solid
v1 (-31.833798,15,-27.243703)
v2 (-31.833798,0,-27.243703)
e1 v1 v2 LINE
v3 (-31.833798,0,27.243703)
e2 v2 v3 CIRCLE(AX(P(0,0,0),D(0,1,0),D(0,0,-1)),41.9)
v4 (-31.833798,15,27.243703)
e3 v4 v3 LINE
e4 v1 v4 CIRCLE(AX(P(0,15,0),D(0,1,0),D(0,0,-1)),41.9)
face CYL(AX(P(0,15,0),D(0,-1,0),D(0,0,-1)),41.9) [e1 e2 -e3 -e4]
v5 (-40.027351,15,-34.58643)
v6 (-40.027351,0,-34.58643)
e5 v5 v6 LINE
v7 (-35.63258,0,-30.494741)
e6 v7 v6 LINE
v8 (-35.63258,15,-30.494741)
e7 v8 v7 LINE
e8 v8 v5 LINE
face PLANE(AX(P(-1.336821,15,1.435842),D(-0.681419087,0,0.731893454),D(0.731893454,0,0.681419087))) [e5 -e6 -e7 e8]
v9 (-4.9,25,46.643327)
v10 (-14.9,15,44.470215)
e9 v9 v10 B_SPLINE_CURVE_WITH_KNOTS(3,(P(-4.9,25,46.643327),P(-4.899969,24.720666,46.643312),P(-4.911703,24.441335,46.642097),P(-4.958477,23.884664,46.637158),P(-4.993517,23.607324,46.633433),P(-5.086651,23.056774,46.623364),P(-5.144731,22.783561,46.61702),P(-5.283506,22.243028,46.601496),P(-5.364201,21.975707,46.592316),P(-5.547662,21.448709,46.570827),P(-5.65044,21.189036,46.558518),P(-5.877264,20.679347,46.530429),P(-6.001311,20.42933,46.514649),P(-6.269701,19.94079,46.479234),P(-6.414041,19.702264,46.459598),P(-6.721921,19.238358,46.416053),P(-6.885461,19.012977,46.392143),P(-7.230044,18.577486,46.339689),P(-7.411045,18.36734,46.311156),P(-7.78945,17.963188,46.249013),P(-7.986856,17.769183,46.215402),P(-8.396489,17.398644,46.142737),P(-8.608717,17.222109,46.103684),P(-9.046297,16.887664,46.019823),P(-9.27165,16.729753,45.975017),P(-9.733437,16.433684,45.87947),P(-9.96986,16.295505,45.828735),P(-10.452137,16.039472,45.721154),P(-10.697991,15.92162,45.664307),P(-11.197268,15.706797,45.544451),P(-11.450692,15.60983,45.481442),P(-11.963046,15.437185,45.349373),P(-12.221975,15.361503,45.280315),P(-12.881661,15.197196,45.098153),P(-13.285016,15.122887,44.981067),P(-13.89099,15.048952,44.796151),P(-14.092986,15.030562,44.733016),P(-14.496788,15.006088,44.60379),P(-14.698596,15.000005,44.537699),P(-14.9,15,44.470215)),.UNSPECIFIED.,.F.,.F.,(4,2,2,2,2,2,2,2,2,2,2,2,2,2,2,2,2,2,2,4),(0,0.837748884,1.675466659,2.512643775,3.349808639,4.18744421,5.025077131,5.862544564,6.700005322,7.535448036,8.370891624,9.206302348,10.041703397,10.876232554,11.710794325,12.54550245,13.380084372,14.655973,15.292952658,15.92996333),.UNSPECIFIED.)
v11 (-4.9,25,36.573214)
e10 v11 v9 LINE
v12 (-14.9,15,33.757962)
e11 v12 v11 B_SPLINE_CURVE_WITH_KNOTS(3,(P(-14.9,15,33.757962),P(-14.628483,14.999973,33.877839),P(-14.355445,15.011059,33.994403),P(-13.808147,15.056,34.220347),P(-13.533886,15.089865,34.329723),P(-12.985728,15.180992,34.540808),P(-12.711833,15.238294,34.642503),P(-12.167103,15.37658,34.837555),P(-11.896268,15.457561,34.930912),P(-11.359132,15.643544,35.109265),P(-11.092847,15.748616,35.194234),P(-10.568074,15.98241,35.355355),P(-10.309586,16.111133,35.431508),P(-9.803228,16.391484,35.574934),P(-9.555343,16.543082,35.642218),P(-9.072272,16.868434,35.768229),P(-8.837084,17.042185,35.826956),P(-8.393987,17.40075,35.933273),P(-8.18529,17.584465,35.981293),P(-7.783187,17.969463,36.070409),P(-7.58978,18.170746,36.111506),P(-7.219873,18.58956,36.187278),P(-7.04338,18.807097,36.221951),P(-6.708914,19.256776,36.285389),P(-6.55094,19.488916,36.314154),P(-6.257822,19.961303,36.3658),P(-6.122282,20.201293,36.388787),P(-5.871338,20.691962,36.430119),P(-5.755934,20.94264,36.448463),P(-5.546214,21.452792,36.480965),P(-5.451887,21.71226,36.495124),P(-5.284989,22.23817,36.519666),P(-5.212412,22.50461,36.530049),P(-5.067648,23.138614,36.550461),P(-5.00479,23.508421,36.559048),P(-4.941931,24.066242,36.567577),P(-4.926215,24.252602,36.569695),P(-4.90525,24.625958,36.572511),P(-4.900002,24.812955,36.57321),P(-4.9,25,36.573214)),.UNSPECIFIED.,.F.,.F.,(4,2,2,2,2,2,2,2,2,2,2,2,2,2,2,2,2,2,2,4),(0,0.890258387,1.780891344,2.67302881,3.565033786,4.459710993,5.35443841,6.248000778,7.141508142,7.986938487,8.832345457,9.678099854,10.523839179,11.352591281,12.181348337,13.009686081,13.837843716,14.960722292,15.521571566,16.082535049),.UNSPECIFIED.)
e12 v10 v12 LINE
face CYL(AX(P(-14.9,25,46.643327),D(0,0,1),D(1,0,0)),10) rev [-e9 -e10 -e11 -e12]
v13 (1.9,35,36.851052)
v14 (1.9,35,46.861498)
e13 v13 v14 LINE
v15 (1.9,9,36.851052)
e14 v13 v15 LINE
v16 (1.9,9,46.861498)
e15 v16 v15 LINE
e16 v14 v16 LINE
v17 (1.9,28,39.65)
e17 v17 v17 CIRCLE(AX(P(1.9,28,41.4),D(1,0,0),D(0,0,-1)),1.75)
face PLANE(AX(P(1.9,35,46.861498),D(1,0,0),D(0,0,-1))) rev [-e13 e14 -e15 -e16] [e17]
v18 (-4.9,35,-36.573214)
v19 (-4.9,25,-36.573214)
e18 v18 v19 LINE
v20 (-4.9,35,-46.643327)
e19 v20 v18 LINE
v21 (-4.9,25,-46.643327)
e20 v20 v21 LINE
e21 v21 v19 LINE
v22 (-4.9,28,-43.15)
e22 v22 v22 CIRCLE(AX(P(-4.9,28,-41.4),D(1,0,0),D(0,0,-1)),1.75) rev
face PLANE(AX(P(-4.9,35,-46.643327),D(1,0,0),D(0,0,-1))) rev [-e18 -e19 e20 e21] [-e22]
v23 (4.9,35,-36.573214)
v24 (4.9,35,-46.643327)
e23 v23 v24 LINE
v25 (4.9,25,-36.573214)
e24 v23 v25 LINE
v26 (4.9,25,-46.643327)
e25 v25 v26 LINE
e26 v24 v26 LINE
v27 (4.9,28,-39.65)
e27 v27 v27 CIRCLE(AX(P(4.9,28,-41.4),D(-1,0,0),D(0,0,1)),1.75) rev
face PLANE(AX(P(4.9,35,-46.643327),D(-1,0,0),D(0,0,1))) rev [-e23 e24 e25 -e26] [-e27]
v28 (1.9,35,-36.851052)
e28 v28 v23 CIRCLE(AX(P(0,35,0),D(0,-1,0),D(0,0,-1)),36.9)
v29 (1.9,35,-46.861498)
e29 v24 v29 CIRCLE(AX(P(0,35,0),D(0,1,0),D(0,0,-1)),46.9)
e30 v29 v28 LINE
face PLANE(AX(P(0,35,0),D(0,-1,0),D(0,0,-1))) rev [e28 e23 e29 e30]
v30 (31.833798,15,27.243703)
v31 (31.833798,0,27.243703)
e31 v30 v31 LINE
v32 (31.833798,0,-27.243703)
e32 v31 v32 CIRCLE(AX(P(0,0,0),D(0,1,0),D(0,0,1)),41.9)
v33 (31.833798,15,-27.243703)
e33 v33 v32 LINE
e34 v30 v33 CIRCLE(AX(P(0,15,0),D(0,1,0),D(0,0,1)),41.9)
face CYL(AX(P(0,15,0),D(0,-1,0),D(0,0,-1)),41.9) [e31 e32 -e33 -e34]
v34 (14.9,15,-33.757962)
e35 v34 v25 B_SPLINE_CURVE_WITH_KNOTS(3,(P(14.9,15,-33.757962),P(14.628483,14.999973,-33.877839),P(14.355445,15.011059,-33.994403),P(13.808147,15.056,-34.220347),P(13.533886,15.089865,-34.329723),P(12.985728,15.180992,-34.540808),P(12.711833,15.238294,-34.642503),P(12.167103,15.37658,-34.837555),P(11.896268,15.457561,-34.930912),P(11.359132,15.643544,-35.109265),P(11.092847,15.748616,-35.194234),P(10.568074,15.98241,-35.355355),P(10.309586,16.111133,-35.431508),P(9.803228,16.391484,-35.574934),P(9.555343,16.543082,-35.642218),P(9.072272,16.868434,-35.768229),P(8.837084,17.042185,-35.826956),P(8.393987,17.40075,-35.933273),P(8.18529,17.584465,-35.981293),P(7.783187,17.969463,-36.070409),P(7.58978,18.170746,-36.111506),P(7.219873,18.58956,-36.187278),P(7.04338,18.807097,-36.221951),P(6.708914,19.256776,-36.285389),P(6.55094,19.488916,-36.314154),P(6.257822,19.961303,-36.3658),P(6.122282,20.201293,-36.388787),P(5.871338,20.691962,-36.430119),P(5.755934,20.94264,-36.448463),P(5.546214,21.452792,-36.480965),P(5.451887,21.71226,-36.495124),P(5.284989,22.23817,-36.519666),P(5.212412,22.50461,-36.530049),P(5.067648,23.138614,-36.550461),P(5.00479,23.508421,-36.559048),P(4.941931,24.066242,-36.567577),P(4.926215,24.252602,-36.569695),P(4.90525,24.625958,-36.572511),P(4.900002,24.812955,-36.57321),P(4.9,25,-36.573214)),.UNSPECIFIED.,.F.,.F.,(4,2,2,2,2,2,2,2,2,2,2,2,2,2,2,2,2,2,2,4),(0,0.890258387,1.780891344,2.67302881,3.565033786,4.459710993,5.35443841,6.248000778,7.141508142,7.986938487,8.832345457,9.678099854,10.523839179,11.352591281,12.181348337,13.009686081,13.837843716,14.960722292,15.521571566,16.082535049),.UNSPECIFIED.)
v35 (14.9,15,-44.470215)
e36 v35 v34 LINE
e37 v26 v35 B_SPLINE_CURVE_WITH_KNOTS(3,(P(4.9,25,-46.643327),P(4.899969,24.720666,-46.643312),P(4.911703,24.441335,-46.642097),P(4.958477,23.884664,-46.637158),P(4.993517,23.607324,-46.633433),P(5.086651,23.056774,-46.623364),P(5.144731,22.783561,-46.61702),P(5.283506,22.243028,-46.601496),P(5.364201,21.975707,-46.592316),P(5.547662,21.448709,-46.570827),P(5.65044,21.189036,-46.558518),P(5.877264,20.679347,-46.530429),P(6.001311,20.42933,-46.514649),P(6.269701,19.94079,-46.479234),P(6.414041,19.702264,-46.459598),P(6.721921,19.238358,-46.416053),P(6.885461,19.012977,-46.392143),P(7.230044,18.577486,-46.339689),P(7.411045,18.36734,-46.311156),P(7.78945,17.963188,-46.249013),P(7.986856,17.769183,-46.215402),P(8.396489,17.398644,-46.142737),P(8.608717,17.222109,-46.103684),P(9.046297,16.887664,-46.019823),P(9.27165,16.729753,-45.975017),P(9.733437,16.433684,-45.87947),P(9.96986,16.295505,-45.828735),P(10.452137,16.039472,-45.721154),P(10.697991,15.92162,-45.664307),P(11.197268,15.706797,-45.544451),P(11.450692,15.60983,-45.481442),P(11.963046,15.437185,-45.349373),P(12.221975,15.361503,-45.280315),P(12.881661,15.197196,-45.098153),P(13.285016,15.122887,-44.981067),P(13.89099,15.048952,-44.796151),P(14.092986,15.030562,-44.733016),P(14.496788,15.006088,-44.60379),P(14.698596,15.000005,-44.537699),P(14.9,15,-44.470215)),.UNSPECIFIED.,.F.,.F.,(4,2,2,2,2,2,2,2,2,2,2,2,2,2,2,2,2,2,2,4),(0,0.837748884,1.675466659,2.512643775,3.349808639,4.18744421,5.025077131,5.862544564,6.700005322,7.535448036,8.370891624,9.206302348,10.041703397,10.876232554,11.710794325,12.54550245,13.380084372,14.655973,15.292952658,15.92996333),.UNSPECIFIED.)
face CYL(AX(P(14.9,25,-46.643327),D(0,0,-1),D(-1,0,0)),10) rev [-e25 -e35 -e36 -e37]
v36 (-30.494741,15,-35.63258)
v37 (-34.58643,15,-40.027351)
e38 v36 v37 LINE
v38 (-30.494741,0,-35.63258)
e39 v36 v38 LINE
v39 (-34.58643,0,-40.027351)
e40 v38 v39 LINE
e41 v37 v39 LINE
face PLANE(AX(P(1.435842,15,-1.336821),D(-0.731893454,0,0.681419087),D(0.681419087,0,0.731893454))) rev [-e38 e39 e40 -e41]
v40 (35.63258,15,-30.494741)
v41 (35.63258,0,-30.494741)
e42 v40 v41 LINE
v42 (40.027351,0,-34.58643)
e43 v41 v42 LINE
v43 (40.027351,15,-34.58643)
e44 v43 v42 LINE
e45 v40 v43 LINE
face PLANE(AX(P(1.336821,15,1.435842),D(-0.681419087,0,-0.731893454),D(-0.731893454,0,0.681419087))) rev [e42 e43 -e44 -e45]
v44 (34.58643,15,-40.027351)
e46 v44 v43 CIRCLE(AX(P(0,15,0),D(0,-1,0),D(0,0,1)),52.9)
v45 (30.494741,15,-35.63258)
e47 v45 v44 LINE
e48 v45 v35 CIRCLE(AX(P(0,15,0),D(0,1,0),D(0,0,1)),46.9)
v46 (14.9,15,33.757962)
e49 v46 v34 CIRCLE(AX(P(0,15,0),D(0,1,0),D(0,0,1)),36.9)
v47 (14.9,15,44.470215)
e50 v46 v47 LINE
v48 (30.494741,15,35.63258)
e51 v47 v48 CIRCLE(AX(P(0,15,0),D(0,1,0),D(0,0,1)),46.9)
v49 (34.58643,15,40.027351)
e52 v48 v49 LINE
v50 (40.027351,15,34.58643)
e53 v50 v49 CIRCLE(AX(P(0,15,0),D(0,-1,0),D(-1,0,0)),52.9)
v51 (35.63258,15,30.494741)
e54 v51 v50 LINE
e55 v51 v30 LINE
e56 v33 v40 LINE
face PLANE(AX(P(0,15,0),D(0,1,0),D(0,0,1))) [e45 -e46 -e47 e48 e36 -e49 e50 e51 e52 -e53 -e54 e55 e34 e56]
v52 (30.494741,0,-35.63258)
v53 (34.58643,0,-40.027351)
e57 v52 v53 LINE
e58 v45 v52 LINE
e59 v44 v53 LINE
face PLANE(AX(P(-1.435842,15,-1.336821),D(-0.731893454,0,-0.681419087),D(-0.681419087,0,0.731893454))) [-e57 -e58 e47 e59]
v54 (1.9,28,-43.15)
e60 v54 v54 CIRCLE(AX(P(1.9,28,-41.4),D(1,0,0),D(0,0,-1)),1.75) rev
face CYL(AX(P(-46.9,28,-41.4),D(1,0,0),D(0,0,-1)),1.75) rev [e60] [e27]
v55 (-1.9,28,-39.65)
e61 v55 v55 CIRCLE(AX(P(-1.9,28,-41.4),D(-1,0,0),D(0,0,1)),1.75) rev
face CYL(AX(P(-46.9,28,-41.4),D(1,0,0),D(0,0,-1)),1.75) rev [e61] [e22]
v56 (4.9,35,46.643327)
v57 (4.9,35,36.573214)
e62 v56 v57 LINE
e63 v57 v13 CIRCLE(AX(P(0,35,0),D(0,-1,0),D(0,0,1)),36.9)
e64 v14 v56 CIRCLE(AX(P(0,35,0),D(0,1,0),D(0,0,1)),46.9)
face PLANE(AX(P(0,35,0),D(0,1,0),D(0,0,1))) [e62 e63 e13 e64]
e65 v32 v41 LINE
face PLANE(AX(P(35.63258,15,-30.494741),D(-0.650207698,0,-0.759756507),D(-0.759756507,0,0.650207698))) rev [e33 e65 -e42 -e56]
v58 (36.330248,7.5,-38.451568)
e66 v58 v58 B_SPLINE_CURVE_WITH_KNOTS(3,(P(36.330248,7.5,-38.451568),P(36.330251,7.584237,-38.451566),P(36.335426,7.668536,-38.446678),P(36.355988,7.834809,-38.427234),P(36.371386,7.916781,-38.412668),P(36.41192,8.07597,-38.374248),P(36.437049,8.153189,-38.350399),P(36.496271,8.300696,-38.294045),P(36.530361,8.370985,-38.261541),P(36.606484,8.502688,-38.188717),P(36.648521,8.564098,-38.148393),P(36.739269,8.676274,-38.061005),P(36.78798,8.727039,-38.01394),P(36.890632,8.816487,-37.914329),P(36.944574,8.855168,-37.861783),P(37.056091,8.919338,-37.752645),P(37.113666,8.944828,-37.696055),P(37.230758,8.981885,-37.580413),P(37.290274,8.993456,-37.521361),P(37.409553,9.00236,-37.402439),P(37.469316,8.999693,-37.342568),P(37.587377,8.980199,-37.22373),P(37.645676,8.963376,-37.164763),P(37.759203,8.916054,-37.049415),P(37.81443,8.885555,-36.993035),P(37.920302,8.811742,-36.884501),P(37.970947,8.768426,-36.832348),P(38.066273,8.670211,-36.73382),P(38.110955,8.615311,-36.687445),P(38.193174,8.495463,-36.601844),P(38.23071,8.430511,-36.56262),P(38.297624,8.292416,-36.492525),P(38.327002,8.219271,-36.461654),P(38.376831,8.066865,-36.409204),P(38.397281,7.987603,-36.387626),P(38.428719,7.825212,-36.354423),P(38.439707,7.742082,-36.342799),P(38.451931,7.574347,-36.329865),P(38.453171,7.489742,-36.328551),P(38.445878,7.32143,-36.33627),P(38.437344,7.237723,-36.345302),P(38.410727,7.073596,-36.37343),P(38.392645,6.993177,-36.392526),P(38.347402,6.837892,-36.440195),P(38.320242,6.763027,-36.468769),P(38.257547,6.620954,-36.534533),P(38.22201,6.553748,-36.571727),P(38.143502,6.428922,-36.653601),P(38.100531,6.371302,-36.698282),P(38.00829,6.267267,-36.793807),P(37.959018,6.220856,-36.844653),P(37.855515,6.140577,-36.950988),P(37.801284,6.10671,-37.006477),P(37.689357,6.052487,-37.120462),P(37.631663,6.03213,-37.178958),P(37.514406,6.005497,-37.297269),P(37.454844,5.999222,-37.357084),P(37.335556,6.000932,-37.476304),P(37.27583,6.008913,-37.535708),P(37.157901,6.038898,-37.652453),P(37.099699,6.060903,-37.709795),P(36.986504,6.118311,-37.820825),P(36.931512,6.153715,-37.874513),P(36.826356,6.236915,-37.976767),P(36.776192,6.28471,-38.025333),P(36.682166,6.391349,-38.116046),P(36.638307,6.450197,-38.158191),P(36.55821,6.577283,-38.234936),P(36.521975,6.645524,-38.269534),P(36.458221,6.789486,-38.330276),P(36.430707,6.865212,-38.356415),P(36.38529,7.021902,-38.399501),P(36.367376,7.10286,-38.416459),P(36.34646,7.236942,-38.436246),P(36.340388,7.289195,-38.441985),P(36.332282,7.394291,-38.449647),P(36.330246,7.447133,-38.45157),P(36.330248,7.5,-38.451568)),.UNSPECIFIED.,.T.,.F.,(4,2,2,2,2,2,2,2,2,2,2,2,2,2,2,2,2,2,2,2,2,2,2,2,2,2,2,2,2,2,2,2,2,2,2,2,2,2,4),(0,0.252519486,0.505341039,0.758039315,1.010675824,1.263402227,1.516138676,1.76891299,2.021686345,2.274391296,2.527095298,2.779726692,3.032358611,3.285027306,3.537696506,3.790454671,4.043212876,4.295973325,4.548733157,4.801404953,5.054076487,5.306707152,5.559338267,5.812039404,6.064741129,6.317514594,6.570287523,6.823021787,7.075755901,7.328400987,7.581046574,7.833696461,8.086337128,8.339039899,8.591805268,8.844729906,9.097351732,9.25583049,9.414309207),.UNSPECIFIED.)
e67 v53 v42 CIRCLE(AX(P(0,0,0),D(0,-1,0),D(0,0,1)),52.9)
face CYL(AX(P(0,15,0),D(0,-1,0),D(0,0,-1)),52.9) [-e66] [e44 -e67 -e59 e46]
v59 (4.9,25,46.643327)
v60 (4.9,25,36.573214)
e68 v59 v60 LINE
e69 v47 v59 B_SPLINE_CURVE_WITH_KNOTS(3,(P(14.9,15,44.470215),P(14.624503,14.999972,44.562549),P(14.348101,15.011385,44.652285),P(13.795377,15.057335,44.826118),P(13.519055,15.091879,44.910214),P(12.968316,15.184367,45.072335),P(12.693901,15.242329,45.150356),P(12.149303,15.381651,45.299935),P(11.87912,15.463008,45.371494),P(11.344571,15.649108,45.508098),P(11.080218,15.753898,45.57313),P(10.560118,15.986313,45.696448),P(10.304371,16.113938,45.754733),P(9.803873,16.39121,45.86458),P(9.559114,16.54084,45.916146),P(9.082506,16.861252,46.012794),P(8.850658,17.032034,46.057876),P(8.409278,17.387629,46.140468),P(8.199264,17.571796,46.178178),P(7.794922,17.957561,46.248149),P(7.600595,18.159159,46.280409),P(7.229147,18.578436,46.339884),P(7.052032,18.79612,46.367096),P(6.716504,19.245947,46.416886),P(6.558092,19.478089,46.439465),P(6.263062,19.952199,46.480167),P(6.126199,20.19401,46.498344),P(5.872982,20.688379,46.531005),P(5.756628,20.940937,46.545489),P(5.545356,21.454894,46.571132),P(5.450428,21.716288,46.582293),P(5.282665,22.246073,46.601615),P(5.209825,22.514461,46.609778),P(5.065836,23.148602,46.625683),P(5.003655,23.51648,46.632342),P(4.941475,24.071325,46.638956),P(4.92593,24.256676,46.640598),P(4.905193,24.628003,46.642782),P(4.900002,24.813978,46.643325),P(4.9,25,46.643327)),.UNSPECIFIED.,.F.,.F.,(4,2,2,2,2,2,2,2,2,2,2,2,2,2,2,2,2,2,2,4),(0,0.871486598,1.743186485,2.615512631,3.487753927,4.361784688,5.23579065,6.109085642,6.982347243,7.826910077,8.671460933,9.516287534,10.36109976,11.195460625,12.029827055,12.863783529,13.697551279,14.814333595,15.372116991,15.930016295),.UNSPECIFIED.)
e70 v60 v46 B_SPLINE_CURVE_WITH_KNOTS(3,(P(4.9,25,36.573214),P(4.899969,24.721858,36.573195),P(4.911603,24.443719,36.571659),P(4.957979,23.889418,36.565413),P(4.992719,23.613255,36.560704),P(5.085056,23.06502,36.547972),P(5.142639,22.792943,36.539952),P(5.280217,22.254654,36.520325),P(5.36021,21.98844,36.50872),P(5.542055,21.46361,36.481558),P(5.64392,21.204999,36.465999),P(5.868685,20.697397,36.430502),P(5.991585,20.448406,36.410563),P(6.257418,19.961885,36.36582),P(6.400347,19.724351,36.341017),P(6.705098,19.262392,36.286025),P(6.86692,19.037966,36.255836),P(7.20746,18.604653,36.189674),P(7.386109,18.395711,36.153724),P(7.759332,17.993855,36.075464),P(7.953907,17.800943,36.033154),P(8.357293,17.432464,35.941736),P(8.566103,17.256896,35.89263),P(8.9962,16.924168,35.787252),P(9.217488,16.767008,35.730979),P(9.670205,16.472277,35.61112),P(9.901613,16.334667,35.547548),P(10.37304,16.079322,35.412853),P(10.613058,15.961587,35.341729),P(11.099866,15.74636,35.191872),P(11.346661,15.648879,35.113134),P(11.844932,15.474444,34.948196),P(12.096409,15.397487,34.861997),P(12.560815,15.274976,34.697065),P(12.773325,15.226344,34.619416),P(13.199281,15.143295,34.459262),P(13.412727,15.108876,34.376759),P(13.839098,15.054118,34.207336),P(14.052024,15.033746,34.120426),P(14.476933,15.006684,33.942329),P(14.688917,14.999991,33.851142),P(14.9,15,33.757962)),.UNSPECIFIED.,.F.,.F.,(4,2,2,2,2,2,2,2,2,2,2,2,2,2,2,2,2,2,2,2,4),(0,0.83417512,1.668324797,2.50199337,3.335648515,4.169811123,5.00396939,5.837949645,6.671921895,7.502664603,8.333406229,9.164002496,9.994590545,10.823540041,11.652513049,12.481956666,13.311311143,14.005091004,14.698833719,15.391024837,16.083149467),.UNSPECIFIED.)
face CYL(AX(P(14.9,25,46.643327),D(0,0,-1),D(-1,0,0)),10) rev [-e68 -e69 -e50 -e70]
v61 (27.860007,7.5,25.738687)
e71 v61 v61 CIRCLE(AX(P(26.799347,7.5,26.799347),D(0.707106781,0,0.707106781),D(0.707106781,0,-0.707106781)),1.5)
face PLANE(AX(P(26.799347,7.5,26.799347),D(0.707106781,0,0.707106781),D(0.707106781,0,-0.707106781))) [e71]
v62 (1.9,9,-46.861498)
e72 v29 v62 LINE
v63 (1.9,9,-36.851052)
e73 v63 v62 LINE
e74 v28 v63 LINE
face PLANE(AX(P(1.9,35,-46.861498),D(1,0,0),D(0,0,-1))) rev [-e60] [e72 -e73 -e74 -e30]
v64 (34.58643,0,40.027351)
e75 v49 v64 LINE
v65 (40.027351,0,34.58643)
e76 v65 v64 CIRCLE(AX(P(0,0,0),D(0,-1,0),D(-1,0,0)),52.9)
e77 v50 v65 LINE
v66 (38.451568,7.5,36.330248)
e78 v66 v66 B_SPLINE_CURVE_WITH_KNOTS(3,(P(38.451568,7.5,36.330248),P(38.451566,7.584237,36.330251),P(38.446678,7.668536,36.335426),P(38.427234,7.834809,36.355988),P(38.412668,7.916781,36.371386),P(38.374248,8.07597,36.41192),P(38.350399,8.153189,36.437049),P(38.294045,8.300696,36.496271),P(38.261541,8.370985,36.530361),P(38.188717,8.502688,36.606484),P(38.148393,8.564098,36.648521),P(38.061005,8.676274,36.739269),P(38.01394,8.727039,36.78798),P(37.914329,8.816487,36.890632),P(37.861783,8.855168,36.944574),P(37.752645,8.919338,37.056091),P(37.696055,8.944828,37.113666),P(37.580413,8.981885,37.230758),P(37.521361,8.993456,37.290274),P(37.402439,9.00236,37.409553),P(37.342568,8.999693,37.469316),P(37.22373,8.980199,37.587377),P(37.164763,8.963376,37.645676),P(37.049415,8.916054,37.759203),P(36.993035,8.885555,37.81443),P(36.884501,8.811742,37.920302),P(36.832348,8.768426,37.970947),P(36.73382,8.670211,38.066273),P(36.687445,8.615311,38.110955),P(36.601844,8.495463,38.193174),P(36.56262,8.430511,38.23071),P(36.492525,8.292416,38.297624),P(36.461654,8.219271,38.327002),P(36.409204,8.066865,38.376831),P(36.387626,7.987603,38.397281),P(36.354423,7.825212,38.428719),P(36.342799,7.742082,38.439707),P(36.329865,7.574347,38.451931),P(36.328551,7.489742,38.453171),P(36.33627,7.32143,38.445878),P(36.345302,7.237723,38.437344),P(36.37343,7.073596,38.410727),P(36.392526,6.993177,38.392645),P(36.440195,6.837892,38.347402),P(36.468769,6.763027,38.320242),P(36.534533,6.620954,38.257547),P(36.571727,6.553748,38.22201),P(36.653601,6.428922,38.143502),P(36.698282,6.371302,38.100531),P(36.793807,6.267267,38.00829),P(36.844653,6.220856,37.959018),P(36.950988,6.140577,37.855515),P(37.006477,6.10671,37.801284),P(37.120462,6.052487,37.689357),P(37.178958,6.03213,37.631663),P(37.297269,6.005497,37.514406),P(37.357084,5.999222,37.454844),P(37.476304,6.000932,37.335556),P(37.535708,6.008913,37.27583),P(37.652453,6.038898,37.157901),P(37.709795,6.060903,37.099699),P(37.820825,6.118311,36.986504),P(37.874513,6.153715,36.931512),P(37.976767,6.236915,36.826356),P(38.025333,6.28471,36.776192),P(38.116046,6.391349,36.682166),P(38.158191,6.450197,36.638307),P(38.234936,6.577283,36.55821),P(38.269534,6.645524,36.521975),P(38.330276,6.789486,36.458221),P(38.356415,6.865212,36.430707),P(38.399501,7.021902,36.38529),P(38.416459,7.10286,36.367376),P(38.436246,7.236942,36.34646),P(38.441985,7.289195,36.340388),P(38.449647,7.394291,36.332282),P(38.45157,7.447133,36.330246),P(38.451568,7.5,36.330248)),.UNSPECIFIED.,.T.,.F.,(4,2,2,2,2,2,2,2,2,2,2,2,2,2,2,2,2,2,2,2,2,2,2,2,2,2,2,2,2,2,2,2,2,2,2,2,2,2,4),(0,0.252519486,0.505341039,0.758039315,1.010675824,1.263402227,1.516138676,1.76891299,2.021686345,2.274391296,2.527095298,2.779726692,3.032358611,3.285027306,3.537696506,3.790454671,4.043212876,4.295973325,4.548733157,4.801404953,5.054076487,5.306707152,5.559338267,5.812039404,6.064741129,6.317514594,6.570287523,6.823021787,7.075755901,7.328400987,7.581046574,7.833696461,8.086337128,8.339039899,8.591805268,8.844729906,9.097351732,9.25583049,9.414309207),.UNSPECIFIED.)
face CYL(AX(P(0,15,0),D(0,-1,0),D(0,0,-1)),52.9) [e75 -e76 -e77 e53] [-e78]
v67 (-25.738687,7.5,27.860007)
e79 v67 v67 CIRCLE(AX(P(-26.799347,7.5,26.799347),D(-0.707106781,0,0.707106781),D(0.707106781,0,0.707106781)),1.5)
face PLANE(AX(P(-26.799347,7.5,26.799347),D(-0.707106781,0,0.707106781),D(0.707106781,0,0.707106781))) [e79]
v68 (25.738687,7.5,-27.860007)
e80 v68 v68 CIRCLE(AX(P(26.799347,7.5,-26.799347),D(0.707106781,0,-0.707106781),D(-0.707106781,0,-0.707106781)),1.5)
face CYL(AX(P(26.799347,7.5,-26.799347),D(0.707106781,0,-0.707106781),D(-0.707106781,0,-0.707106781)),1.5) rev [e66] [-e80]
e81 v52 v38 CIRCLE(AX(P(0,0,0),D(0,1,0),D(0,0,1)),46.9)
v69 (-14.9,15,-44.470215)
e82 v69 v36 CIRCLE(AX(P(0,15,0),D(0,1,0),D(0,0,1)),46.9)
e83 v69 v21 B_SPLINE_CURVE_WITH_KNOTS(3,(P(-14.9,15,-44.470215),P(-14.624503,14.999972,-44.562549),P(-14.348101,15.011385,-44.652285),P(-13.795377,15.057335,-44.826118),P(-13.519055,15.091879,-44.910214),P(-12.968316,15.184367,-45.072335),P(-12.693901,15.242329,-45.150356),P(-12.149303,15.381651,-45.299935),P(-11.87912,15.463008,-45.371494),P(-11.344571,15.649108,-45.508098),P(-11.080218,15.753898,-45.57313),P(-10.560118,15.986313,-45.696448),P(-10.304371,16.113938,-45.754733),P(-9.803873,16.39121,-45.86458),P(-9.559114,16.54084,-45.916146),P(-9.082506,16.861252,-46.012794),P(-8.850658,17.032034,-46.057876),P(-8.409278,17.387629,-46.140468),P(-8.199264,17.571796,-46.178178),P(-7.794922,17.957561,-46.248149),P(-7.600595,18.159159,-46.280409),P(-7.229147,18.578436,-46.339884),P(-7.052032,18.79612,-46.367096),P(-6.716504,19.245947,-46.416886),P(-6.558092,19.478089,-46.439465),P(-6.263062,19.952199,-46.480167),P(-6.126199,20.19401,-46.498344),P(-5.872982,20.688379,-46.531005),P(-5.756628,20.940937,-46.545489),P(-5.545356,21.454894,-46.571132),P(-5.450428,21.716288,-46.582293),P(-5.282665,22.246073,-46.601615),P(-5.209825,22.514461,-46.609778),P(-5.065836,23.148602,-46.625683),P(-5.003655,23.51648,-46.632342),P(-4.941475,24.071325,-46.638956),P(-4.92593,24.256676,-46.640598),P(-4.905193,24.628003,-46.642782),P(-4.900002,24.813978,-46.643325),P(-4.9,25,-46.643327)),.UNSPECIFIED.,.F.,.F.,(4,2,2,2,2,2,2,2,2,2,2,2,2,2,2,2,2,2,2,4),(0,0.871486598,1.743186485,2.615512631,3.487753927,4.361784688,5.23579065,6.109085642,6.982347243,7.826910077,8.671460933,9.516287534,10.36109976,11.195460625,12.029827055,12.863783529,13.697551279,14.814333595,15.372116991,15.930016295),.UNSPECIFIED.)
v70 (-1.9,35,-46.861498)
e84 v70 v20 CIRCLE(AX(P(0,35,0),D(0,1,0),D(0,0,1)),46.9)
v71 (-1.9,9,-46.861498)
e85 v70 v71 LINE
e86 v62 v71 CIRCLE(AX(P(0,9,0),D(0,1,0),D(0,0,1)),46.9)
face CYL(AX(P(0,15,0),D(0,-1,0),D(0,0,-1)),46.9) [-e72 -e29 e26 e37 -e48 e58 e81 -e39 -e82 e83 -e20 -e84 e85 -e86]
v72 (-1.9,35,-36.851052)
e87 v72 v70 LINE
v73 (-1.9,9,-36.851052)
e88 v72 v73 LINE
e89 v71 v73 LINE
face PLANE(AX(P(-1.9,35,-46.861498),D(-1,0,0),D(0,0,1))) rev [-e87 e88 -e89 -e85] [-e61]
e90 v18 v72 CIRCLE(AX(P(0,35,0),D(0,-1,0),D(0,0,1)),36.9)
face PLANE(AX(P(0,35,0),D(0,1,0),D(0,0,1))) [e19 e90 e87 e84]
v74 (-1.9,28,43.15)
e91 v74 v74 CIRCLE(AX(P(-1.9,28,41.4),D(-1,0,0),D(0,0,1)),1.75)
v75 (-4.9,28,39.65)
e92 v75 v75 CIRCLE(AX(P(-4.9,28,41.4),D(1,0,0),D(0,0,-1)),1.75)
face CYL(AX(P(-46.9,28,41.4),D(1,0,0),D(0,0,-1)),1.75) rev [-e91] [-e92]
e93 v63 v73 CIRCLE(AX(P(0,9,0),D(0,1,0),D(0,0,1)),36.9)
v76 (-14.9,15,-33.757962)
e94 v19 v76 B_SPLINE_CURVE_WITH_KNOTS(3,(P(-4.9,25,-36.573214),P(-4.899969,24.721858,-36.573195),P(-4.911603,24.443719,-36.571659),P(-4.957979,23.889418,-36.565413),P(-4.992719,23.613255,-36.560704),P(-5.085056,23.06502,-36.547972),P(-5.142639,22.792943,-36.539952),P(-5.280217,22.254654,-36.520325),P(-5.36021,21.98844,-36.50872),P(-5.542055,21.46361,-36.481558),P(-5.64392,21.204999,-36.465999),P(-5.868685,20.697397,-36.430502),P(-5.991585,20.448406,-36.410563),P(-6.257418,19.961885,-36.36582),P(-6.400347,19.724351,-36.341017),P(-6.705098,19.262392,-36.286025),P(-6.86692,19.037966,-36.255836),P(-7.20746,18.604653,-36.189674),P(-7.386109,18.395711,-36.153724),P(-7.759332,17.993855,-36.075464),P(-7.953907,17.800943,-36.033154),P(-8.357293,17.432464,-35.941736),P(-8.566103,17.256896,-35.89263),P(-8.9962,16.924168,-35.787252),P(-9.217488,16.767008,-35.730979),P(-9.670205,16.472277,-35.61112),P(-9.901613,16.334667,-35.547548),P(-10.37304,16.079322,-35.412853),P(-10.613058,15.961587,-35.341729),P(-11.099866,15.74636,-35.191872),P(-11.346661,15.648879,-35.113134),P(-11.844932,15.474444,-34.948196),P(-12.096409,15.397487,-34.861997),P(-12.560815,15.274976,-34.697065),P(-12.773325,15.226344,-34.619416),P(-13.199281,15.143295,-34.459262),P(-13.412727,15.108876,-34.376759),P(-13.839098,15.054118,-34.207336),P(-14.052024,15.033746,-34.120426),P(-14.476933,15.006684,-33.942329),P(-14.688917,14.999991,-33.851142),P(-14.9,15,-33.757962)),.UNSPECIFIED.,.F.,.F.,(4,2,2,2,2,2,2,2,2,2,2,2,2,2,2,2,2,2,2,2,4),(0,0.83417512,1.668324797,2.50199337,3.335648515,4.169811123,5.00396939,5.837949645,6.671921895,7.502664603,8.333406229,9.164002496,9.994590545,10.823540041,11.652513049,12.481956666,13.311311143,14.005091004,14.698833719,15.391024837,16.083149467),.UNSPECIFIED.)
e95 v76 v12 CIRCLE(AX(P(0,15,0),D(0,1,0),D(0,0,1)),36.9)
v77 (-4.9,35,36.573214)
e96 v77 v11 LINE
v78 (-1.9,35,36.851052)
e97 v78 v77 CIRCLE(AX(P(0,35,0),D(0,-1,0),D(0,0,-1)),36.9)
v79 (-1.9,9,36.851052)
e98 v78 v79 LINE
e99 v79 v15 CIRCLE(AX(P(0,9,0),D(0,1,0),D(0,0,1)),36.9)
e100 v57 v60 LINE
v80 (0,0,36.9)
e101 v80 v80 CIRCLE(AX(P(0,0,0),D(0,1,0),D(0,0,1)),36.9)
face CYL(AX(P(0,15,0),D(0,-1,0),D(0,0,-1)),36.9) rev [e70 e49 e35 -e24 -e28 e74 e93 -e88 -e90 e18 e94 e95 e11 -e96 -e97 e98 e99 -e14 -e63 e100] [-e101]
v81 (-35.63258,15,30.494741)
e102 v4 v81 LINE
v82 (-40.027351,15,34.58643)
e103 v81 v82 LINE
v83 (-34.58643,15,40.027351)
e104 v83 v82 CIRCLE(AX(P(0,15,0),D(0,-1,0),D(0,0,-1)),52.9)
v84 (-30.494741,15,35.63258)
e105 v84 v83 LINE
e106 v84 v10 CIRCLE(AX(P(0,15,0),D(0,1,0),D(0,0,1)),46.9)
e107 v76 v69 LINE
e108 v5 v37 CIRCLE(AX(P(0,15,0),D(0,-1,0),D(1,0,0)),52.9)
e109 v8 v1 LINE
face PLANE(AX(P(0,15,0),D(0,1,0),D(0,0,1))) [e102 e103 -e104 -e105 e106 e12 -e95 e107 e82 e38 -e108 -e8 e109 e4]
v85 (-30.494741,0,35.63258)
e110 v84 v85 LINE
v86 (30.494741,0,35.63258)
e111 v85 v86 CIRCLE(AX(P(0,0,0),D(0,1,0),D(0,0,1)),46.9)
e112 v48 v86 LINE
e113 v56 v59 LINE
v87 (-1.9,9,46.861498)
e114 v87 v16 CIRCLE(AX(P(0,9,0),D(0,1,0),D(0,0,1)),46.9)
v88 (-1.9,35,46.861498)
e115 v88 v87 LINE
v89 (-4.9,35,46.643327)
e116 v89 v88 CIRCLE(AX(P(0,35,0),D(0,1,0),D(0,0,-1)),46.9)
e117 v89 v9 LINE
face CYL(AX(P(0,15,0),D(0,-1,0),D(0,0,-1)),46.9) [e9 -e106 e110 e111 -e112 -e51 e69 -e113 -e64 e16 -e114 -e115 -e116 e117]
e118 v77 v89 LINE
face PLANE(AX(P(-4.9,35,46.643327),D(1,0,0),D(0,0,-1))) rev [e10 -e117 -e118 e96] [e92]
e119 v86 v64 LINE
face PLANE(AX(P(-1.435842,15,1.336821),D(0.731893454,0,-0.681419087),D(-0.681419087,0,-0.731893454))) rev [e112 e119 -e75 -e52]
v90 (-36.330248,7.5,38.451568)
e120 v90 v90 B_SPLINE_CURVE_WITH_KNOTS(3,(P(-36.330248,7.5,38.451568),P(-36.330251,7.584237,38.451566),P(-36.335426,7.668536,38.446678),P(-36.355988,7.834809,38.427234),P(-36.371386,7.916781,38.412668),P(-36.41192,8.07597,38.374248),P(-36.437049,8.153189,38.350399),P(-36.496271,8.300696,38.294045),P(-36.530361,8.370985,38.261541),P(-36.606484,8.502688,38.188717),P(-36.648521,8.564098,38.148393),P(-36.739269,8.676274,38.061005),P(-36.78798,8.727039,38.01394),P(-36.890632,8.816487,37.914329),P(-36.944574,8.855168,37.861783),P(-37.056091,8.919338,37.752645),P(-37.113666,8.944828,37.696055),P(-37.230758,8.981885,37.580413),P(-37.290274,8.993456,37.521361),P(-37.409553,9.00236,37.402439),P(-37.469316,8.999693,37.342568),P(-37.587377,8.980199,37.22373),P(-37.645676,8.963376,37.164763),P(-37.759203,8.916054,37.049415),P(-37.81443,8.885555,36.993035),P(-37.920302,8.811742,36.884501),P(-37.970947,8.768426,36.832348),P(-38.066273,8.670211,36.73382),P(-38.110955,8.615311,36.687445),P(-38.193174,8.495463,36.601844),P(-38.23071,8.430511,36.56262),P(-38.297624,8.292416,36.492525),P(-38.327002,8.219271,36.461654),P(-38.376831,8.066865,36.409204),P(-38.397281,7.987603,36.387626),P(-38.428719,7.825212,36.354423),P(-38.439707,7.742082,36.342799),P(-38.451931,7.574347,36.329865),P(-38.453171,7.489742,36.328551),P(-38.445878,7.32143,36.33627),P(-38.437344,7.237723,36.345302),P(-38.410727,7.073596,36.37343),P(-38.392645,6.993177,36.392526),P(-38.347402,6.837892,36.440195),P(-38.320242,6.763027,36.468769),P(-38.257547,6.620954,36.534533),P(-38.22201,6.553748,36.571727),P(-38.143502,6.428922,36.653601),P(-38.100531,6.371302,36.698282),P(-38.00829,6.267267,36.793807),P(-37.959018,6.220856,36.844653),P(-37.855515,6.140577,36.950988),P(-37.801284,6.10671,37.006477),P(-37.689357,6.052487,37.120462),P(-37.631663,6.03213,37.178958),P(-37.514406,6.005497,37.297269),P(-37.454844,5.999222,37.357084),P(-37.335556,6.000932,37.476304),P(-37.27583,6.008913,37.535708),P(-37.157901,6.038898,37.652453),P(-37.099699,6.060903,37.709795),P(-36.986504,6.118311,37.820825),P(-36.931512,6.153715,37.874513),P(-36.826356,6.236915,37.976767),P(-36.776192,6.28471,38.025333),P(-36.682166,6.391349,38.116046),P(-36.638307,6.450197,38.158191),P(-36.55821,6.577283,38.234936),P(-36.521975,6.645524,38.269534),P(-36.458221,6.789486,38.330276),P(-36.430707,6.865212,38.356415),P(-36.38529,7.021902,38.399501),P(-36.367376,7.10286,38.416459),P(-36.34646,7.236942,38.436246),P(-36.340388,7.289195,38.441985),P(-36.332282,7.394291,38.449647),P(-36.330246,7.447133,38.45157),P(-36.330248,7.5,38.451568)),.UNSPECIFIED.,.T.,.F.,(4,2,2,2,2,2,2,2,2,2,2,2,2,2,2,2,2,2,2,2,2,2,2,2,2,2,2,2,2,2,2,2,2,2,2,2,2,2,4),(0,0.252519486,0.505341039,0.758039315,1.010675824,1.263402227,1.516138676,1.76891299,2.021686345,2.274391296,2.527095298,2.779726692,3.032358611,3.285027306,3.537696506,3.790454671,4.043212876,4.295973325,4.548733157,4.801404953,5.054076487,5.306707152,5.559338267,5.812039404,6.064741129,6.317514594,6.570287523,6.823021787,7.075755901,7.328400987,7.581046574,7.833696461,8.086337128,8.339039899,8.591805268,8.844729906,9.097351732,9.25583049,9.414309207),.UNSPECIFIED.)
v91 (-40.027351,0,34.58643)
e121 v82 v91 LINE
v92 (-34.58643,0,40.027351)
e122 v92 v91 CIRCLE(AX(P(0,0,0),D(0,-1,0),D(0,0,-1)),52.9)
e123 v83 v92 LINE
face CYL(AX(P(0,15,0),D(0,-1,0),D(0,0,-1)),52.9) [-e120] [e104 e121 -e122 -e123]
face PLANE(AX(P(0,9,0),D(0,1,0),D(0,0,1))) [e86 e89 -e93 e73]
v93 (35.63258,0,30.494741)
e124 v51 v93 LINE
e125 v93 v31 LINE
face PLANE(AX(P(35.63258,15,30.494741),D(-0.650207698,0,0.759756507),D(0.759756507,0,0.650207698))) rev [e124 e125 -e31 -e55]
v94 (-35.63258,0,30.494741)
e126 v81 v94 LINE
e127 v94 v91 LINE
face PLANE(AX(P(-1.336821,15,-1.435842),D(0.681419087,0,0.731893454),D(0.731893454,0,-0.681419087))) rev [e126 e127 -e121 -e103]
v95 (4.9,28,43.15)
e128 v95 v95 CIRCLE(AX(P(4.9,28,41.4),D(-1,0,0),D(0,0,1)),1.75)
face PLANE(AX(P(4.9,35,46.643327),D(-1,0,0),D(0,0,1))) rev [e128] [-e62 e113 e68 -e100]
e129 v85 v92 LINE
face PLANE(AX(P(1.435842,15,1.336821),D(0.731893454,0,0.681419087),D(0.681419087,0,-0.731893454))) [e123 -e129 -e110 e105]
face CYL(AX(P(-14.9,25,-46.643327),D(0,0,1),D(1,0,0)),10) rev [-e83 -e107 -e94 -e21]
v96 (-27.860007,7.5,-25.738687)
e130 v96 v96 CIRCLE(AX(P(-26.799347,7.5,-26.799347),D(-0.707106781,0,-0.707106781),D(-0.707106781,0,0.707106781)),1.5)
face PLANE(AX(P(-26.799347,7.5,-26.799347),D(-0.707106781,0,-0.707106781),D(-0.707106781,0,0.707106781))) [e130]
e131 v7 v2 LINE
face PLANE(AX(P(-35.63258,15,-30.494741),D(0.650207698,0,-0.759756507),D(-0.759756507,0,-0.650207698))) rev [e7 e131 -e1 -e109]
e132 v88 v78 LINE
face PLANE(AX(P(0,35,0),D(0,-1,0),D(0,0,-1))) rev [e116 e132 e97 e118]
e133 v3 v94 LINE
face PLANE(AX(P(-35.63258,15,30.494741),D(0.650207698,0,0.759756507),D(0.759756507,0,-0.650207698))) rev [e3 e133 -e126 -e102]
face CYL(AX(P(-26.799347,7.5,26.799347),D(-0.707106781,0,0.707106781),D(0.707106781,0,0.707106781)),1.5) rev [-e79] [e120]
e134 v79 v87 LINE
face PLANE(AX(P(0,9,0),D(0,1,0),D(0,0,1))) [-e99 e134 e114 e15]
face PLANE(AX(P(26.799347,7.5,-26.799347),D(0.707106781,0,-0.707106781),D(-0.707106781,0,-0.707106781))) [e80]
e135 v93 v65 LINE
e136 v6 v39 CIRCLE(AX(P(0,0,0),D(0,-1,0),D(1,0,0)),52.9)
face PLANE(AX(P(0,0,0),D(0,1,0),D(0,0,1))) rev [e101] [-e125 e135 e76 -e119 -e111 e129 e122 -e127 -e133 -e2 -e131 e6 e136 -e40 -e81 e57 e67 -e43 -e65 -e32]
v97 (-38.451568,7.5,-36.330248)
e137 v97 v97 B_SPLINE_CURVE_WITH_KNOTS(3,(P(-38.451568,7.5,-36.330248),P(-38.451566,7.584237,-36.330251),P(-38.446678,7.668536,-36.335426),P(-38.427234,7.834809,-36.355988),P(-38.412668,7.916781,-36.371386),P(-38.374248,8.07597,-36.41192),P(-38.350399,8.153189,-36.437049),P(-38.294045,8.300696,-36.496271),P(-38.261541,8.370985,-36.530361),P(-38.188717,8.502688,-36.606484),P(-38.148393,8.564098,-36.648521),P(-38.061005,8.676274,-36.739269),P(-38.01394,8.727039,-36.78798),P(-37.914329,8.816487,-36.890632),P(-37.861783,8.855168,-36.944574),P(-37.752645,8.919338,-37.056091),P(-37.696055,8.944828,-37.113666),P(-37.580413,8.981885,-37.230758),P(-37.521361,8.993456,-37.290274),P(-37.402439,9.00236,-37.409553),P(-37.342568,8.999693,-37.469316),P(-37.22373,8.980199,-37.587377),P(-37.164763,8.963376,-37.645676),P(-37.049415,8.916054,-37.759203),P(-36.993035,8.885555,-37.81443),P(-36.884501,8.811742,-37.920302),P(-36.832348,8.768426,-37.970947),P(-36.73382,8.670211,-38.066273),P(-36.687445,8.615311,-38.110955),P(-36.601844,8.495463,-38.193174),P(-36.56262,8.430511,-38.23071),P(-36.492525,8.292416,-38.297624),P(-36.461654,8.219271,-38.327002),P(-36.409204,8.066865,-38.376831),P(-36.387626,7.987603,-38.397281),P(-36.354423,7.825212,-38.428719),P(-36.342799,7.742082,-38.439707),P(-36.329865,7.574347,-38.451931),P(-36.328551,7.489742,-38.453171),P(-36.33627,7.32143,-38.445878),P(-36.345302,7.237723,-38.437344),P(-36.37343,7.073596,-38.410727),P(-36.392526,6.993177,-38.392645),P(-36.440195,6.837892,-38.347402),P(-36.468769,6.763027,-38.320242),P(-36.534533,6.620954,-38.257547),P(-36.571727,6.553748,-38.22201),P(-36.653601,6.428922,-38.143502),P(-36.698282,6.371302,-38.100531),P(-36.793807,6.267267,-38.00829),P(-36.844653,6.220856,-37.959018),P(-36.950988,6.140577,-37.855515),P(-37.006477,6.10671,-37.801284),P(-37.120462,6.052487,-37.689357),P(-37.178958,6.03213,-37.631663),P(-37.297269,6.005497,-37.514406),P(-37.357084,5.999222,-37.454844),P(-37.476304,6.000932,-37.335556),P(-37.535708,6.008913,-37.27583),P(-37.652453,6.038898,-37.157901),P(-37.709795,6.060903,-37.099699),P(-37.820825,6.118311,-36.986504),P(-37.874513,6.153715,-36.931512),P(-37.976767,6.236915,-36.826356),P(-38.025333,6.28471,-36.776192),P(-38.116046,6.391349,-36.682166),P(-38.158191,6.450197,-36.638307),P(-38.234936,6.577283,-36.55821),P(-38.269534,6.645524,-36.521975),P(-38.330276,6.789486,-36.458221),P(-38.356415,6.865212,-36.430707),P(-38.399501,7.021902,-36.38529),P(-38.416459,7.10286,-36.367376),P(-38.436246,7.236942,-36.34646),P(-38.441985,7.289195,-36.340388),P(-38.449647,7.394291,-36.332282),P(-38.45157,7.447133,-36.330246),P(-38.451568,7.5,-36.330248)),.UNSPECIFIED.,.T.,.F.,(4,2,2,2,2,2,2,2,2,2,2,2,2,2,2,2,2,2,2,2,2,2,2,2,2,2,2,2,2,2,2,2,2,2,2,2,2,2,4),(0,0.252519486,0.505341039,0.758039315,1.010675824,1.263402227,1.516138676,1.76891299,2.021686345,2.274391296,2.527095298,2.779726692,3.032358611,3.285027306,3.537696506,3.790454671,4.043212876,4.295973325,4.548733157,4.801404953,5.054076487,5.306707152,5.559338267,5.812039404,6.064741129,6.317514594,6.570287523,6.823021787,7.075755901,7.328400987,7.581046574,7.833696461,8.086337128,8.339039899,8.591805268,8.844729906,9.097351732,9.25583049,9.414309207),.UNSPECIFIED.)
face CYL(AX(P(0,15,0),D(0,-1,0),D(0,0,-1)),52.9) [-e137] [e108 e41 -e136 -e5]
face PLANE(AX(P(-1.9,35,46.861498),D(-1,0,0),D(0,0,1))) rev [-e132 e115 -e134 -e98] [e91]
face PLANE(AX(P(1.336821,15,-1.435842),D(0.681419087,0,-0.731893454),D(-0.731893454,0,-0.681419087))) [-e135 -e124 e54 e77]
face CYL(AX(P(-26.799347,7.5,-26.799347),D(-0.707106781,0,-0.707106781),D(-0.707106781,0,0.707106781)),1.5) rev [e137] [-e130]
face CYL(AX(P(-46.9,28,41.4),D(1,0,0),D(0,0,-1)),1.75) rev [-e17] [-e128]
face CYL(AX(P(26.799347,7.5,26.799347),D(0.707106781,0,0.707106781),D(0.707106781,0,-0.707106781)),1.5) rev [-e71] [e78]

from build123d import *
from build123d.topology import SkipClean

# Parameters (mm, degrees)
SKETCH1_R           = 46.9
SKETCH1_R_2         = 36.9
BOSS_EXTRUDE1_DEPTH = 15
BOSS_EXTRUDE2_DEPTH = 20
SKETCH4_W           = 3.8
SKETCH4_H           = 13.672543204
CUT_EXTRUDE2_DEPTH  = 6
SKETCH5_R           = 1.75
CUT_EXTRUDE3_DEPTH  = 75.99479982
FILLET3_R           = 10
BOSS_EXTRUDE3_DEPTH = 15
SKETCH9_R           = 1.5
CUT_EXTRUDE4_DEPTH  = 15
CIRPATTERN1_COUNT   = 4
CUT_EXTRUDE5_DEPTH  = 15


with BuildPart() as part:
    # Sketch1 → Boss-Extrude1 (new body)
    with BuildSketch(Plane(origin=(0, 0, 0), x_dir=(1, 0, 0), z_dir=(0, 1, 0))):
        with Locations(Location((0, 0, 0), (0, 0, 270))):
            Circle(SKETCH1_R)
        with Locations(Location((0, 0, 0), (0, 0, 270))):
            Circle(SKETCH1_R_2, mode=Mode.SUBTRACT)
    extrude(amount=BOSS_EXTRUDE1_DEPTH)

    # Sketch7 → Boss-Extrude2 (add)
    with SkipClean():  # the faces are left unmerged after this step: merging them gives an invalid solid
        with BuildSketch(Plane(origin=(0, 15, 0), x_dir=(1, 0, 0), z_dir=(0, 1, 0))):
            with BuildLine():
                Line((-1.9, 46.861498055), (-1.9, 36.851051545))
                ThreePointArc((-1.9, 36.851051545), (-3.402836815, 36.742763935), (-4.9, 36.573214242))
                Line((-4.9, 36.573214242), (-4.9, 46.643327497))
                ThreePointArc((-4.9, 46.643327497), (-3.401749491, 46.776469516), (-1.9, 46.861498055))
            make_face()
            with BuildLine():
                Line((4.9, 46.643327497), (4.9, 36.573214242))
                ThreePointArc((4.9, 36.573214242), (3.402836815, 36.742763935), (1.9, 36.851051545))
                Line((1.9, 36.851051545), (1.9, 46.861498055))
                ThreePointArc((1.9, 46.861498055), (3.401749491, 46.776469516), (4.9, 46.643327497))
            make_face()
            with BuildLine():
                Line((1.9, -46.861498055), (1.9, -36.851051545))
                ThreePointArc((1.9, -36.851051545), (3.402836815, -36.742763935), (4.9, -36.573214242))
                Line((4.9, -36.573214242), (4.9, -46.643327497))
                ThreePointArc((4.9, -46.643327497), (3.401749491, -46.776469516), (1.9, -46.861498055))
            make_face()
            with BuildLine():
                Line((-4.9, -46.643327497), (-4.9, -36.573214242))
                ThreePointArc((-4.9, -36.573214242), (-3.402836815, -36.742763935), (-1.9, -36.851051545))
                Line((-1.9, -36.851051545), (-1.9, -46.861498055))
                ThreePointArc((-1.9, -46.861498055), (-3.401749491, -46.776469516), (-4.9, -46.643327497))
            make_face()
        extrude(amount=BOSS_EXTRUDE2_DEPTH)

    # Sketch4 → Cut-Extrude2 (cut)
    with SkipClean():  # the faces are left unmerged after this step: merging them gives an invalid solid
        with BuildSketch(Plane(origin=(0, 15, 0), x_dir=(1, 0, 0), z_dir=(0, 1, 0))):
            with Locations((0, 42.34115802)):
                Rectangle(SKETCH4_W, SKETCH4_H)
            with Locations((0, -42.34115802)):
                Rectangle(SKETCH4_W, SKETCH4_H)
        extrude(amount=-CUT_EXTRUDE2_DEPTH, mode=Mode.SUBTRACT)

    # Sketch5 → Cut-Extrude3 (cut, symmetric)
    with SkipClean():  # the faces are left unmerged after this step: merging them gives an invalid solid
        with BuildSketch(Plane(origin=(0, 0, 0), x_dir=(0, 0, -1), z_dir=(1, 0, 0))):
            with Locations((-41.4, 28)):
                Circle(SKETCH5_R)
        cut_extrude3 = extrude(amount=CUT_EXTRUDE3_DEPTH, both=True, mode=Mode.SUBTRACT)

    # Mirror1: Cut-Extrude3 across plane
    with SkipClean():  # the faces are left unmerged after this step: merging them gives an invalid solid
        add(cut_extrude3.mirror(Plane.XY), mode=Mode.SUBTRACT)

    # Fillet3
    # the kernel refuses this fillet: 10 mm, written as the material it adds along each edge
    with BuildSketch(Plane(origin=(-4.9, 15, -11.573214242), x_dir=(-1, 0, 0), z_dir=(0, 0, -1))) as fillet3_piece_1_section:
        with BuildLine():
            CenterArc((FILLET3_R, FILLET3_R), FILLET3_R, 180, 90)
            Line((0, FILLET3_R), (0, 0))
            Line((0, 0), (FILLET3_R, 0))
        make_face()
    fillet3_piece_1 = extrude(amount=60.070113255, mode=Mode.PRIVATE)
    fillet3_piece_1 = fillet3_piece_1 & Plane(origin=(0, 17.250849012, 0), x_dir=(0, 0, 1), z_dir=(0, -1, 0)) * Cylinder(46.9, 161, mode=Mode.PRIVATE)
    fillet3_piece_1 = fillet3_piece_1 - Plane(origin=(0, 17.250849012, 0), x_dir=(0, 0, 1), z_dir=(0, -1, 0)) * Cylinder(36.9, 161, mode=Mode.PRIVATE)
    with BuildSketch(Plane(origin=(4.9, 15, -71.643327497), x_dir=(1, 0, 0), z_dir=(0, 0, 1))) as fillet3_piece_2_section:
        with BuildLine():
            CenterArc((FILLET3_R, FILLET3_R), FILLET3_R, 180, 90)
            Line((0, FILLET3_R), (0, 0))
            Line((0, 0), (FILLET3_R, 0))
        make_face()
    fillet3_piece_2 = extrude(amount=60.070113255, mode=Mode.PRIVATE)
    fillet3_piece_2 = fillet3_piece_2 & Plane(origin=(0, 17.250856037, 0), x_dir=(0, 0, 1), z_dir=(0, -1, 0)) * Cylinder(46.9, 161, mode=Mode.PRIVATE)
    fillet3_piece_2 = fillet3_piece_2 - Plane(origin=(0, 17.250856037, 0), x_dir=(0, 0, 1), z_dir=(0, -1, 0)) * Cylinder(36.9, 161, mode=Mode.PRIVATE)
    with BuildSketch(Plane(origin=(4.9, 15, 11.573214242), x_dir=(1, 0, 0), z_dir=(0, 0, 1))) as fillet3_piece_3_section:
        with BuildLine():
            CenterArc((FILLET3_R, FILLET3_R), FILLET3_R, 180, 90)
            Line((0, FILLET3_R), (0, 0))
            Line((0, 0), (FILLET3_R, 0))
        make_face()
    fillet3_piece_3 = extrude(amount=60.070113255, mode=Mode.PRIVATE)
    fillet3_piece_3 = fillet3_piece_3 & Plane(origin=(0, 17.250849012, 0), x_dir=(0, 0, 1), z_dir=(0, -1, 0)) * Cylinder(46.9, 161, mode=Mode.PRIVATE)
    fillet3_piece_3 = fillet3_piece_3 - Plane(origin=(0, 17.250849012, 0), x_dir=(0, 0, 1), z_dir=(0, -1, 0)) * Cylinder(36.9, 161, mode=Mode.PRIVATE)
    with BuildSketch(Plane(origin=(-4.9, 15, 71.643327497), x_dir=(-1, 0, 0), z_dir=(0, 0, -1))) as fillet3_piece_4_section:
        with BuildLine():
            CenterArc((FILLET3_R, FILLET3_R), FILLET3_R, 180, 90)
            Line((0, FILLET3_R), (0, 0))
            Line((0, 0), (FILLET3_R, 0))
        make_face()
    fillet3_piece_4 = extrude(amount=60.070113255, mode=Mode.PRIVATE)
    fillet3_piece_4 = fillet3_piece_4 & Plane(origin=(0, 17.250856037, 0), x_dir=(0, 0, 1), z_dir=(0, -1, 0)) * Cylinder(46.9, 161, mode=Mode.PRIVATE)
    fillet3_piece_4 = fillet3_piece_4 - Plane(origin=(0, 17.250856037, 0), x_dir=(0, 0, 1), z_dir=(0, -1, 0)) * Cylinder(36.9, 161, mode=Mode.PRIVATE)
    add([fillet3_piece_1, fillet3_piece_2, fillet3_piece_3, fillet3_piece_4])

    # Sketch8 → Boss-Extrude3 (add)
    with BuildSketch(Plane.XZ):
        with BuildLine():
            ThreePointArc((-35.632580164, 30.494741036), (-33.163308038, 33.163308038), (-30.494741036, 35.632580164))
            Line((-30.494741036, 35.632580164), (-34.586430477, 40.027350984))
            ThreePointArc((-34.586430477, 40.027350984), (-37.405948725, 37.405948725), (-40.027350984, 34.586430477))
            Line((-40.027350984, 34.586430477), (-35.632580164, 30.494741036))
        make_face()
    boss_extrude3 = extrude(amount=-BOSS_EXTRUDE3_DEPTH)

    # Sketch9 → Cut-Extrude4 (cut)
    with BuildSketch(Plane(origin=(-37.405948725, 0, 37.405948725), x_dir=(0, -1, 0), z_dir=(-0.7071067811865488, 0, 0.7071067811865464))):
        with Locations(Location((-7.5, 0, 0), (0, 0, 90))):
            Circle(SKETCH9_R)
    cut_extrude4 = extrude(amount=-CUT_EXTRUDE4_DEPTH, mode=Mode.SUBTRACT)

    # CirPattern1: Boss-Extrude3, Cut-Extrude4 ×4 about axis
    cirpattern1_axis = Axis((0, 0, 0), (0, 1, 0))
    add([boss_extrude3.rotate(cirpattern1_axis, i * 360 / CIRPATTERN1_COUNT) for i in range(1, CIRPATTERN1_COUNT)])
    add([cut_extrude4.rotate(cirpattern1_axis, i * 360 / CIRPATTERN1_COUNT) for i in range(1, CIRPATTERN1_COUNT)], mode=Mode.SUBTRACT)

    # Sketch10 → Cut-Extrude5 (cut)
    with BuildSketch(Plane.XZ):
        with BuildLine():
            Line((-35.632580164, 30.494741036), (-31.833797631, 27.243702546))
            ThreePointArc((-31.833797631, 27.243702546), (-41.9, 0), (-31.833797631, -27.243702546))
            Line((-31.833797631, -27.243702546), (-35.632580164, -30.494741036))
            ThreePointArc((-35.632580164, -30.494741036), (-46.9, 0), (-35.632580164, 30.494741036))
        make_face()
        with BuildLine():
            Line((35.632580164, -30.494741036), (31.833797631, -27.243702546))
            ThreePointArc((31.833797631, -27.243702546), (41.9, 0), (31.833797631, 27.243702546))
            Line((31.833797631, 27.243702546), (35.632580164, 30.494741036))
            ThreePointArc((35.632580164, 30.494741036), (46.9, 0), (35.632580164, -30.494741036))
        make_face()
    extrude(amount=-CUT_EXTRUDE5_DEPTH, mode=Mode.SUBTRACT)


solid = part.part
